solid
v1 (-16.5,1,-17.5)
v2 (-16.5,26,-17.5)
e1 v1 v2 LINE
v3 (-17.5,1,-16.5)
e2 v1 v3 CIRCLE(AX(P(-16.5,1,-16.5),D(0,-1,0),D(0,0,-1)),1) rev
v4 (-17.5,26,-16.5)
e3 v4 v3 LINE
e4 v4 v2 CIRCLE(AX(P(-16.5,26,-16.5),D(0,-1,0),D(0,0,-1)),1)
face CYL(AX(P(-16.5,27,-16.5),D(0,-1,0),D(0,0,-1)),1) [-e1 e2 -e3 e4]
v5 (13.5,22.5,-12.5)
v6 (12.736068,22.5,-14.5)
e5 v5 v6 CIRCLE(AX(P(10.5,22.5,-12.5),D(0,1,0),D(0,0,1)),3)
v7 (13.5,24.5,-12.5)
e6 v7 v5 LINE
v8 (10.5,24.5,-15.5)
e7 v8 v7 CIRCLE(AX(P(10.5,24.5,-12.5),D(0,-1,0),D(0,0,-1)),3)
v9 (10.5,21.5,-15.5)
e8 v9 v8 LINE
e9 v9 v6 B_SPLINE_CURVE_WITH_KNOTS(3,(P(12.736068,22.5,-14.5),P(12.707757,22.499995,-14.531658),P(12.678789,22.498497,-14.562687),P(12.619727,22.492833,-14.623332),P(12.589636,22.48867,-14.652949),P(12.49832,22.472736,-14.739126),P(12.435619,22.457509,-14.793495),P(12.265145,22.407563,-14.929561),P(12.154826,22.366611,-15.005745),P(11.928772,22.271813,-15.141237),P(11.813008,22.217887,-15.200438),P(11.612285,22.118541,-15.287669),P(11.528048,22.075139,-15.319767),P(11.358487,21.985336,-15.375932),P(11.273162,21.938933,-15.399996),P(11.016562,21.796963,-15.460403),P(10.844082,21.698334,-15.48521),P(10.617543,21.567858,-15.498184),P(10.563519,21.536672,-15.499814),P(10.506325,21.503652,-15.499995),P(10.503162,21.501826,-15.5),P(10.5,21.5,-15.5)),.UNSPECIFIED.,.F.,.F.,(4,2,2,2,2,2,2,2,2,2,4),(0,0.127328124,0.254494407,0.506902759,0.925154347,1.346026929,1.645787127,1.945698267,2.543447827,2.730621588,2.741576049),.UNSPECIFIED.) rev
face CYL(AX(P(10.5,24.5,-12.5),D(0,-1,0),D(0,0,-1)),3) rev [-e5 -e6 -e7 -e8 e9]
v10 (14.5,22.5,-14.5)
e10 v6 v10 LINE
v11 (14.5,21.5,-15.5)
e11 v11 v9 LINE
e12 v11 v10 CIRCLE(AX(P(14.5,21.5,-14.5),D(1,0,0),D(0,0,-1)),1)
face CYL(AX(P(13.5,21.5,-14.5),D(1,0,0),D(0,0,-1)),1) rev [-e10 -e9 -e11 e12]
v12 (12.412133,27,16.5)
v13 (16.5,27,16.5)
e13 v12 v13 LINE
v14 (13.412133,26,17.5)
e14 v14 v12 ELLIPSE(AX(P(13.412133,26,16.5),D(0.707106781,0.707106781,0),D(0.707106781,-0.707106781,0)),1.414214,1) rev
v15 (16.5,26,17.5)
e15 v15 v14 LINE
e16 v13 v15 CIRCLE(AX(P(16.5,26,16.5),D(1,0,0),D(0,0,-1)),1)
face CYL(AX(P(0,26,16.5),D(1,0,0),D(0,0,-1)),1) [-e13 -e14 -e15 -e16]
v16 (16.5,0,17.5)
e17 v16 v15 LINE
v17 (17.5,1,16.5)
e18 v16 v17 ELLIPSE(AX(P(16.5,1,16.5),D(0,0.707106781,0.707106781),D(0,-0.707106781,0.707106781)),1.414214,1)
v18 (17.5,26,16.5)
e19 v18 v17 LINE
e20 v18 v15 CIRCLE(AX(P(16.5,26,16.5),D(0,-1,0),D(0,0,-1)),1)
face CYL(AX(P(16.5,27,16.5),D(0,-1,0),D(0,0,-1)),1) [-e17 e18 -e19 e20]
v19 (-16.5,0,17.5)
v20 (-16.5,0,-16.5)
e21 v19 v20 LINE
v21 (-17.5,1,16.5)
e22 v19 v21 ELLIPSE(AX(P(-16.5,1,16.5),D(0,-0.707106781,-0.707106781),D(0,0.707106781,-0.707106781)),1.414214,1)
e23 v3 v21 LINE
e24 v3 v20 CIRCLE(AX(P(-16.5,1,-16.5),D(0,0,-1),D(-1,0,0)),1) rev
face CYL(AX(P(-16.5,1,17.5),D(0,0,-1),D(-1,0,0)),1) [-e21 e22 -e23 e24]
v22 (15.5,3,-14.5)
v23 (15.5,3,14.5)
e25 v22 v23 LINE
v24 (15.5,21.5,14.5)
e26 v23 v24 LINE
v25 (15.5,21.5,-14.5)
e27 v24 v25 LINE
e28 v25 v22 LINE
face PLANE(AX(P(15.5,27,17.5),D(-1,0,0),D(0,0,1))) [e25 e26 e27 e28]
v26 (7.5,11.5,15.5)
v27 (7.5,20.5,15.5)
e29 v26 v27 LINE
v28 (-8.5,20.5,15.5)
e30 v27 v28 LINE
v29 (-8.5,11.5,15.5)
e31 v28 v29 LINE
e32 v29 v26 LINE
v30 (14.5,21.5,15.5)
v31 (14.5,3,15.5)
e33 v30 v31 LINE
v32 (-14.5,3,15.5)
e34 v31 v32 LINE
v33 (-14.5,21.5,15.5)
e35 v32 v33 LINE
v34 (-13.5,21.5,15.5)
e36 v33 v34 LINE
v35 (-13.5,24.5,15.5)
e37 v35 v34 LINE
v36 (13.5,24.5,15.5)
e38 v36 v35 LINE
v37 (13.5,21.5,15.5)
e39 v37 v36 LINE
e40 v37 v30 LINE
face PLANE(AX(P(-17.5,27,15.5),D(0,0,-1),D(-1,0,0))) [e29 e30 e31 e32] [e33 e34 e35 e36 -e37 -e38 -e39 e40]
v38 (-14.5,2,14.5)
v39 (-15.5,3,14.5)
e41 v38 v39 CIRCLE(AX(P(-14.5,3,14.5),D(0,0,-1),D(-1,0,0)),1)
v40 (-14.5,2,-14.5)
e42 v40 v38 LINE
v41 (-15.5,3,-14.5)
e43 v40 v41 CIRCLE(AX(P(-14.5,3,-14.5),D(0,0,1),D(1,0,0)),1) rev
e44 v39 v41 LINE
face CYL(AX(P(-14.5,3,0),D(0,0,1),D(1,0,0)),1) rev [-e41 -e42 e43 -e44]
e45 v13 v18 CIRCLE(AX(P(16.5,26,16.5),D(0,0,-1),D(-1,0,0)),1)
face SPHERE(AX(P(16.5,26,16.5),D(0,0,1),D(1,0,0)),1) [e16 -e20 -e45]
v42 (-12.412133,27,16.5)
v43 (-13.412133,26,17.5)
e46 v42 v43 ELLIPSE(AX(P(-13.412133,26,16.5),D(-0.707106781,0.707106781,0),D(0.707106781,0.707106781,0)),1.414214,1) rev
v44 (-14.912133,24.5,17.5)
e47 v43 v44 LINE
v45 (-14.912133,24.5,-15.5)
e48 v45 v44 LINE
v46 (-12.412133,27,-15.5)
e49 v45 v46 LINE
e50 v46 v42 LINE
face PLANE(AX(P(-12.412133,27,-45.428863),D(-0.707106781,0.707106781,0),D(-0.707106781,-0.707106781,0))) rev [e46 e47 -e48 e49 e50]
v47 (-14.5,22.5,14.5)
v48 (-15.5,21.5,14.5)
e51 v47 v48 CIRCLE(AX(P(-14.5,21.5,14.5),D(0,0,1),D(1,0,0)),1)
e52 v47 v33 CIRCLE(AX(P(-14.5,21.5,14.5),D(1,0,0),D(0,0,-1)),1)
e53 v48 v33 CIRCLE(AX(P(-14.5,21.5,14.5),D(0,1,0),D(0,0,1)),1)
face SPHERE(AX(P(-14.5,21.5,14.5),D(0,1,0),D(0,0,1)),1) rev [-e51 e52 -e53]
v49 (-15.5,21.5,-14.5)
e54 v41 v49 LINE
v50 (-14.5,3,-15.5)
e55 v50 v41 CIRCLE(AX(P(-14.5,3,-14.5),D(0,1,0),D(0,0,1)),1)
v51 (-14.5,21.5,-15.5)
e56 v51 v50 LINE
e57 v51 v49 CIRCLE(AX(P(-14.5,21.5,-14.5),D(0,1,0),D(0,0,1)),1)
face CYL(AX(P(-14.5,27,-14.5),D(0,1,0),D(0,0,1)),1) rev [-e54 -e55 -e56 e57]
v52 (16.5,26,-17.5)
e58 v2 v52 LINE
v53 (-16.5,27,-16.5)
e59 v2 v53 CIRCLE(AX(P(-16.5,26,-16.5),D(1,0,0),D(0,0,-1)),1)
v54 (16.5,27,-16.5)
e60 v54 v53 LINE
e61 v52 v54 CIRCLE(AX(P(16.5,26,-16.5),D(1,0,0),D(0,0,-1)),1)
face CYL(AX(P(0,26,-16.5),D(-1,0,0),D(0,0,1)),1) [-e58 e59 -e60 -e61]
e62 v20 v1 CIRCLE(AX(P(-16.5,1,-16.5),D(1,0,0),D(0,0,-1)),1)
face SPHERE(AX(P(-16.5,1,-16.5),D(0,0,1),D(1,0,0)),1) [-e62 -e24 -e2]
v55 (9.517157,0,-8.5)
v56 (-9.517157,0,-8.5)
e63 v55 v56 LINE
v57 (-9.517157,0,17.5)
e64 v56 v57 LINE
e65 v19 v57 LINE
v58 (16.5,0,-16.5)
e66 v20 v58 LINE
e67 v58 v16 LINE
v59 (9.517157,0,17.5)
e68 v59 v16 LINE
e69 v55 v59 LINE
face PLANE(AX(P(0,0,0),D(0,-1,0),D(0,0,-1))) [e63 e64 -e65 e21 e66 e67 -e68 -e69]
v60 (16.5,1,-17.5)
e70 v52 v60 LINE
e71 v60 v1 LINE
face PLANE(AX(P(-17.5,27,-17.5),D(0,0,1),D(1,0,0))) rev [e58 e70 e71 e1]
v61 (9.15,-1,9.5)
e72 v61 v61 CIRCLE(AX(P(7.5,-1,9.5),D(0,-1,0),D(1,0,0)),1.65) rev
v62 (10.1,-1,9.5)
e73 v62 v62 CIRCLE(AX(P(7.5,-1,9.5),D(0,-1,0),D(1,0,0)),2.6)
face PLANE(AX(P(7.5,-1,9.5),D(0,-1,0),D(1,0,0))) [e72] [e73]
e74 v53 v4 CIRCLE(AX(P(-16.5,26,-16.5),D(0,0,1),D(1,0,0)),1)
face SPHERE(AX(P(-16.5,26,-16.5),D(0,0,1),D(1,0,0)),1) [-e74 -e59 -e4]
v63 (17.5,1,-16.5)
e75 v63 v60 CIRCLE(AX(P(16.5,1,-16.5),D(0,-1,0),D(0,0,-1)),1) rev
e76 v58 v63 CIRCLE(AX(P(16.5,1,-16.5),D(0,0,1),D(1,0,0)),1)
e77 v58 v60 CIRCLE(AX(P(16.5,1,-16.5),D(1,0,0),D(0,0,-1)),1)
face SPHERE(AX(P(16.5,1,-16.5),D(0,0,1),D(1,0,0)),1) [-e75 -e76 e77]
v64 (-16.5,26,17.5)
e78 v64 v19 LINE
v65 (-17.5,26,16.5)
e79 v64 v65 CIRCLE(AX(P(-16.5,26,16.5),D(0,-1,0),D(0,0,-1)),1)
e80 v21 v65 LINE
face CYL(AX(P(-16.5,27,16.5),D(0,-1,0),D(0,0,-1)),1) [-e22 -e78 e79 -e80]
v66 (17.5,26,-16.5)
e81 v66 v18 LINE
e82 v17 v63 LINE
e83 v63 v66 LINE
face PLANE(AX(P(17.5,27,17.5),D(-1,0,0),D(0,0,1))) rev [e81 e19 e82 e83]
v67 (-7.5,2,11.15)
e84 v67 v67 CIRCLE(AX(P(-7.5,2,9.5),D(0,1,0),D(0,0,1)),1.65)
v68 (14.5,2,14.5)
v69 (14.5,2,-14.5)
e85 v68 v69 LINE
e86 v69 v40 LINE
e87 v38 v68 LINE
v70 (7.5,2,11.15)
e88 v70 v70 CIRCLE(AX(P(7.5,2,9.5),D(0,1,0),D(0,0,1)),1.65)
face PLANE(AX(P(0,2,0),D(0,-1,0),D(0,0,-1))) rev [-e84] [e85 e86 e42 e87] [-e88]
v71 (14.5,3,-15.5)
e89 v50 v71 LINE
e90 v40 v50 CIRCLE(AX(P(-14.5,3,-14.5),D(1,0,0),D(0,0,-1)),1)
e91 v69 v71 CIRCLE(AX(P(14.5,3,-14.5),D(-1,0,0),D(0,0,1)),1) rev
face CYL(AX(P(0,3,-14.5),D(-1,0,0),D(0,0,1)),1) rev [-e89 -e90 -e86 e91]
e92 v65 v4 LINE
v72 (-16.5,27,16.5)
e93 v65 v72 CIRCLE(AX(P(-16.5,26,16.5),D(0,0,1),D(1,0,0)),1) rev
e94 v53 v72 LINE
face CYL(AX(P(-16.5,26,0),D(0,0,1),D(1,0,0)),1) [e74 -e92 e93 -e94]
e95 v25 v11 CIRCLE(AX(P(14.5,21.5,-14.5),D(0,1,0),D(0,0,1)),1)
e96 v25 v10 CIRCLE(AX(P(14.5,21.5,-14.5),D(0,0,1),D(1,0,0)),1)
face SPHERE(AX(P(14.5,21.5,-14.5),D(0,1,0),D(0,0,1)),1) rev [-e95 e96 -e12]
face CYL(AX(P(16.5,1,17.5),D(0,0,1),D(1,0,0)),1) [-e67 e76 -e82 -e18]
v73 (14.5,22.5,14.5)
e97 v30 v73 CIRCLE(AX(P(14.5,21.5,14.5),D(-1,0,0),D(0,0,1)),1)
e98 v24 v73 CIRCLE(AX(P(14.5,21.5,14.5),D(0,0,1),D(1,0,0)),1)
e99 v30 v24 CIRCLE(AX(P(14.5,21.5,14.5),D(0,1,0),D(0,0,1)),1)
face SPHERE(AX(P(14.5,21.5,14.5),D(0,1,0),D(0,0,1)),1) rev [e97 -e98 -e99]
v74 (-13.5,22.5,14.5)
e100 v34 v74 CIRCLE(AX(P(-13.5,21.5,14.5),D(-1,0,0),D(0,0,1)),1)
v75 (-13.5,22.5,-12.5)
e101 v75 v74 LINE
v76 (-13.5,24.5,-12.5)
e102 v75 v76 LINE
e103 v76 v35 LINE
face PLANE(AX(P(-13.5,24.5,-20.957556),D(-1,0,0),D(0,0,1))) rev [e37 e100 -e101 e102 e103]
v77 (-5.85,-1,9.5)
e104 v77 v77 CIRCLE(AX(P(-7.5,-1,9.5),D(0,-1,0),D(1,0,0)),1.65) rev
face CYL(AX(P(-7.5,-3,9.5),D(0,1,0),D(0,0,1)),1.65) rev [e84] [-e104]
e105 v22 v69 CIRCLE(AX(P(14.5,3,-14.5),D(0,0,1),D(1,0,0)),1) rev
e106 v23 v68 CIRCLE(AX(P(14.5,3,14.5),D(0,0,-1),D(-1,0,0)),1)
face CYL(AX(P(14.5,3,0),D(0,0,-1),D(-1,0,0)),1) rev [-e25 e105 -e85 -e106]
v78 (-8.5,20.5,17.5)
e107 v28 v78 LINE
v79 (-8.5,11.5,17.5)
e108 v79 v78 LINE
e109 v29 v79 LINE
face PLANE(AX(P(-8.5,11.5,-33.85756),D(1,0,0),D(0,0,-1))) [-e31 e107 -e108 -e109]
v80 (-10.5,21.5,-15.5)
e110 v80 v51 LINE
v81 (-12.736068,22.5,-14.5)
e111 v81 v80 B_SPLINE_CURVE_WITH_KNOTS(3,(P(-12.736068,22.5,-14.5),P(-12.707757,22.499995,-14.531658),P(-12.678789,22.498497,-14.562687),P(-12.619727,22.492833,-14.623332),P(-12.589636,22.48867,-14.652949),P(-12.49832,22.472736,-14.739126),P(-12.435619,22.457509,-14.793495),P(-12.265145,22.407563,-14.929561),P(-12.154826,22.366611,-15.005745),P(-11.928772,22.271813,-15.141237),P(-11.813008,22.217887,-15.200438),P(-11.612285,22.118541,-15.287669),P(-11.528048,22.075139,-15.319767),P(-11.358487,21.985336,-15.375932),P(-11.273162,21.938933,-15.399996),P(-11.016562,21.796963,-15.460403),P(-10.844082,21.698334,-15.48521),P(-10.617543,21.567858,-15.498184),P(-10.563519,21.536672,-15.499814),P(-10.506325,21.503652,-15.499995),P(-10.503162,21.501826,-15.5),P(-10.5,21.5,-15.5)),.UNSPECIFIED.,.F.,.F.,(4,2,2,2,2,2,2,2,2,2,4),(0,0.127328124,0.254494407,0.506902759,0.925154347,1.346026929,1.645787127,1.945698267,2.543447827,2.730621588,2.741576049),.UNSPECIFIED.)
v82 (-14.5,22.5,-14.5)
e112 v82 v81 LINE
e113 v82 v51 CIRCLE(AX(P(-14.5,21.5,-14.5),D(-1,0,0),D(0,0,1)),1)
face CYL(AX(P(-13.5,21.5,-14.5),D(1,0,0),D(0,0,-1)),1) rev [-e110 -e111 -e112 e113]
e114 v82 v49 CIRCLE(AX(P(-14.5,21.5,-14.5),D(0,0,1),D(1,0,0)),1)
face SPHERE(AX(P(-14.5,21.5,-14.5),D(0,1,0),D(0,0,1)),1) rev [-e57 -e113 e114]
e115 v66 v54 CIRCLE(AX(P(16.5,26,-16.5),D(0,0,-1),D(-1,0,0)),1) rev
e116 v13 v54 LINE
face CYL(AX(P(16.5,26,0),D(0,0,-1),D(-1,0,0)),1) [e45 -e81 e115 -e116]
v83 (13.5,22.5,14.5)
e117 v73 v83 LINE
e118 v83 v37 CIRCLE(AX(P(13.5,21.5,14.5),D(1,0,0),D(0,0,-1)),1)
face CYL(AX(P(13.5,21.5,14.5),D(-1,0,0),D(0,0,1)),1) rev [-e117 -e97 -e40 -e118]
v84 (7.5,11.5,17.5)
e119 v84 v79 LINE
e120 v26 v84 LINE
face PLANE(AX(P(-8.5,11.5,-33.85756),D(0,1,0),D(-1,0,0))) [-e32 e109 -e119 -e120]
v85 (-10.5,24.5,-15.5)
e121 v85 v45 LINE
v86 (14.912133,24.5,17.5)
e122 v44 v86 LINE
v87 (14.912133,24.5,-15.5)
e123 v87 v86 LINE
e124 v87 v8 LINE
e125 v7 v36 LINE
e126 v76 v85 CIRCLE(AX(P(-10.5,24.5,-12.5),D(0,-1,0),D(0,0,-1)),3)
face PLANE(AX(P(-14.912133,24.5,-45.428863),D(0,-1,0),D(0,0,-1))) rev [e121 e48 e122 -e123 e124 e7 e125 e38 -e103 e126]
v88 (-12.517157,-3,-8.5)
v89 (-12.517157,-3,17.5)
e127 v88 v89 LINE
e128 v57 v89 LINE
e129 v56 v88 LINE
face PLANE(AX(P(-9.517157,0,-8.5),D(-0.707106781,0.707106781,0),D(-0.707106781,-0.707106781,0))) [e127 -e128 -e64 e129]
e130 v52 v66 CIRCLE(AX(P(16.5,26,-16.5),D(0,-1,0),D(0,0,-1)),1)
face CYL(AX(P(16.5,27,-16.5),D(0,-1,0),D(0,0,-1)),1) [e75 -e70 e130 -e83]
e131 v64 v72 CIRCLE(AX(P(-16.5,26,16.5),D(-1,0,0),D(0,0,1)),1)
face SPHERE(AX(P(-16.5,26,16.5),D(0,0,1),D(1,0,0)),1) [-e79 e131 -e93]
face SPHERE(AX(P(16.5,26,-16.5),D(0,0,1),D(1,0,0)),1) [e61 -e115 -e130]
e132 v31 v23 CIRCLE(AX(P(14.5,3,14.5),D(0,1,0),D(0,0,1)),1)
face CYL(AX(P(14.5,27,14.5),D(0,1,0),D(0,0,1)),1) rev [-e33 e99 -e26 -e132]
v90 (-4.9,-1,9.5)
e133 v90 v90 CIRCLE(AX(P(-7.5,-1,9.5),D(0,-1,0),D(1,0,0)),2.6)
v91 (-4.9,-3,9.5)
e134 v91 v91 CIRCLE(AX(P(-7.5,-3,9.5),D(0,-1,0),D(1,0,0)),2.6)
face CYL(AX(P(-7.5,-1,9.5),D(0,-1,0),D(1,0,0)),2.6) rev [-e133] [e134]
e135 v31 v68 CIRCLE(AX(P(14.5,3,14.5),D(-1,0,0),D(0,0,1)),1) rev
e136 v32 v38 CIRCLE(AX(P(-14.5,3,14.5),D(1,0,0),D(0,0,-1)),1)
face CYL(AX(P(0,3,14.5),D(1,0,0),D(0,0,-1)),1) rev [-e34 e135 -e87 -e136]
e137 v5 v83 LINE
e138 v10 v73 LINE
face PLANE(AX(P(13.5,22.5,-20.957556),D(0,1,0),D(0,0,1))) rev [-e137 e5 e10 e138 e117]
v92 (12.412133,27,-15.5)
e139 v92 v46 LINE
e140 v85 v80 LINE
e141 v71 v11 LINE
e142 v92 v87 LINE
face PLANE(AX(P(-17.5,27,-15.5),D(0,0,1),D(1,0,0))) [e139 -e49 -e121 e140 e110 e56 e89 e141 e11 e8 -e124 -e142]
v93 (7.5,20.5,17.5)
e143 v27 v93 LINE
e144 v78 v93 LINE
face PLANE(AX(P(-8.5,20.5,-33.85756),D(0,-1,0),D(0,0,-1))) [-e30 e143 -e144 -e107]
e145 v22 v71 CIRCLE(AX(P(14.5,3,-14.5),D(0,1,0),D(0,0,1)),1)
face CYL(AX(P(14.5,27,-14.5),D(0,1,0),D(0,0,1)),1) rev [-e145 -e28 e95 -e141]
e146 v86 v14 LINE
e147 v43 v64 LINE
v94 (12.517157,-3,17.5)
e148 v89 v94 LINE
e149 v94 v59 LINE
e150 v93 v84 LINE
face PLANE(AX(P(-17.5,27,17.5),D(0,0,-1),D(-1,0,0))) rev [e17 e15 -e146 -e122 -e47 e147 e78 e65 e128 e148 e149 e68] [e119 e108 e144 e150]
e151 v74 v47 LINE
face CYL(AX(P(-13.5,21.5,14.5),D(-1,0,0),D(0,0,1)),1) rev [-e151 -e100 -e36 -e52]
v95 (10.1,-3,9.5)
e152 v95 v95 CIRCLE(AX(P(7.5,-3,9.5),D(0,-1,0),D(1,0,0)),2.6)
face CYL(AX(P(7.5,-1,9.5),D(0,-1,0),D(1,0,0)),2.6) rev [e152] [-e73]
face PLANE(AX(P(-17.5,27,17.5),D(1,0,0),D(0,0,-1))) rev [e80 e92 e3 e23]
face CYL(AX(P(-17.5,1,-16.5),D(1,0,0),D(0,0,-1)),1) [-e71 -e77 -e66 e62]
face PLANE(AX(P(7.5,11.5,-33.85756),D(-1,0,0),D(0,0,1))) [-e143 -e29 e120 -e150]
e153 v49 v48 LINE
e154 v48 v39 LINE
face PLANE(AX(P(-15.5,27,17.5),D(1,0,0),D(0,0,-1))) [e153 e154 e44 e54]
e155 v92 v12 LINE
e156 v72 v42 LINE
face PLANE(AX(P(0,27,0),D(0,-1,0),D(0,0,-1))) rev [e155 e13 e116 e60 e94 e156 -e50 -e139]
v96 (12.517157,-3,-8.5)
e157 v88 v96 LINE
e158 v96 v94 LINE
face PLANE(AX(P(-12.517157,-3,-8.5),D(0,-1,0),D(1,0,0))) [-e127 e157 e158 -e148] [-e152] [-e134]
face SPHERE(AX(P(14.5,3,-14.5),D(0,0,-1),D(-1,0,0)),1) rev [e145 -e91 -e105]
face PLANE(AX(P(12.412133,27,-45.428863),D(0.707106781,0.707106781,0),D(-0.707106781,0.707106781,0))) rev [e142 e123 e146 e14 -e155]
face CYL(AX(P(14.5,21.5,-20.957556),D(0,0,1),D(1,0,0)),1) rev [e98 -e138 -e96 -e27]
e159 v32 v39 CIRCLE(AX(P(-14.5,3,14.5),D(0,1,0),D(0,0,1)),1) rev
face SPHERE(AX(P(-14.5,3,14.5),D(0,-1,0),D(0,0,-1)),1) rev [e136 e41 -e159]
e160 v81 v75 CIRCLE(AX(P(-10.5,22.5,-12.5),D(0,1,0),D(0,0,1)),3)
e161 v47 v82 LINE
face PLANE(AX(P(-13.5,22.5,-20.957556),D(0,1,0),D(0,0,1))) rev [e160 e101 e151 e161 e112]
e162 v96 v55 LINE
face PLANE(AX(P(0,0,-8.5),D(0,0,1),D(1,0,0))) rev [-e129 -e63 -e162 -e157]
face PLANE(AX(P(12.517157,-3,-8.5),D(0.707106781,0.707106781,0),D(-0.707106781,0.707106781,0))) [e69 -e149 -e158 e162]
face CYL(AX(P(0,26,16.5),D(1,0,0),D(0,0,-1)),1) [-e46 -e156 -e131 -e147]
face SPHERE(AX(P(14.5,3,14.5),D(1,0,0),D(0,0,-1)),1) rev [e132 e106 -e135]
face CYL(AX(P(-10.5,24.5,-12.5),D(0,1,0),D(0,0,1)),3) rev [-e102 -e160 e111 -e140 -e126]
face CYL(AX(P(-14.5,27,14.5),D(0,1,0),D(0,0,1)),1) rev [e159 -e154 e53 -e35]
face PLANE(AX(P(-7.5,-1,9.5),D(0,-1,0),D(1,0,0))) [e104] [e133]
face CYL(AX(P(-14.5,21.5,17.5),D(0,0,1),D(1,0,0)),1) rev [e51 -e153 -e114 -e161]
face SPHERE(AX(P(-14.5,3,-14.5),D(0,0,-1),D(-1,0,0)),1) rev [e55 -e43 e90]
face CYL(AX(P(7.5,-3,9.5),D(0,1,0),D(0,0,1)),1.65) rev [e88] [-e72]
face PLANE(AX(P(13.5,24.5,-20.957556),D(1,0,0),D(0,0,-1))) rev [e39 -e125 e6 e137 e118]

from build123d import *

# Parameters (mm, degrees)
SKETCH1_W           = 35
SKETCH1_H           = 35
BOSS_EXTRUDE1_DEPTH = 27
SHELL1_T            = -2
CUT_EXTRUDE7_DEPTH  = 33
BOSS_EXTRUDE4_DEPTH = 31
BOSS_EXTRUDE3_DEPTH = 26
FILLET1_R           = 1
FILLET2_R           = 1
FILLET3_R           = 1
FILLET4_R           = 1
SKETCH10_R          = 1.65
CUT_EXTRUDE3_DEPTH  = 36.178118199
SKETCH11_W          = 16
SKETCH11_H          = 9
CUT_EXTRUDE4_DEPTH  = 2
SKETCH13_R          = 2.6
CUT_EXTRUDE6_DEPTH  = 2
FILLET5_R           = 3
FILLET6_R           = 1


with BuildPart() as part:
    # Sketch1 → Boss-Extrude1 (new body)
    with BuildSketch(Plane(origin=(0, 0, 0), x_dir=(1, 0, 0), z_dir=(0, 1, 0))):
        Rectangle(SKETCH1_W, SKETCH1_H)
    extrude(amount=BOSS_EXTRUDE1_DEPTH)

    # Shell1
    shell1_openings = [part.faces().sort_by_distance(p)[0] for p in [
        (0, 27, 0),
    ]]
    offset(amount=SHELL1_T, openings=shell1_openings, kind=Kind.INTERSECTION)

    # Sketch5 → Cut-Extrude7 (cut)
    with BuildSketch(Plane.XY.offset(17.5)):
        Polygon((-12.412133126, 27), (12.412133126, 27), (14.912133126, 24.5), (-14.912133126, 24.5), align=None)
    extrude(amount=-CUT_EXTRUDE7_DEPTH, mode=Mode.SUBTRACT)

    # Sketch16 → Boss-Extrude4 (add)
    with BuildSketch(Plane(origin=(0, 0, 15.5), x_dir=(-1, 0, 0), z_dir=(0, 0, -1))):
        Polygon((-15.5, 27), (-12.412133126, 27), (-14.912133126, 24.5), (-13.5, 24.5), (-13.5, 22.5), (-15.5, 22.5), align=None)
        Polygon((13.5, 22.5), (15.5, 22.5), (15.5, 27), (12.412133126, 27), (14.912133126, 24.5), (13.5, 24.5), align=None)
    extrude(amount=BOSS_EXTRUDE4_DEPTH)

    # Sketch9 → Boss-Extrude3 (add)
    with BuildSketch(Plane.XY.offset(17.5)):
        Polygon((-9.517157288, 0), (-12.517157288, -3), (12.517157288, -3), (9.517157288, 0), align=None)
    extrude(amount=-BOSS_EXTRUDE3_DEPTH)

    # Fillet1
    fillet1_edges = [part.edges().sort_by_distance(p)[0] for p in [
        (15.5, 2, 0),
        (0, 2, -15.5),
        (-15.5, 2, 0),
        (0, 2, 15.5),
        (15.5, 12.25, 15.5),
        (15.5, 12.25, -15.5),
        (-15.5, 12.25, -15.5),
        (-15.5, 12.25, 15.5),
    ]]
    fillet(fillet1_edges, radius=FILLET1_R)

    # Fillet2
    fillet2_edges = [part.edges().sort_by_distance(p)[0] for p in [
        (-17.5, 27, 0),
        (17.5, 27, 0),
        (-17.5, 0, 0),
        (17.5, 0, 0),
        (17.5, 13.5, 17.5),
        (-17.5, 13.5, 17.5),
        (-17.5, 13.5, -17.5),
        (17.5, 13.5, -17.5),
    ]]
    fillet(fillet2_edges, radius=FILLET2_R)

    # Fillet3
    # the kernel refuses this fillet: 1 mm, written as the material it takes off along each edge
    with BuildSketch(Plane(origin=(16.5, 26, -16.5), x_dir=(0, 0, -1), z_dir=(0, 1, 0))) as fillet3_piece_1_section:
        Polygon((0, 0), (FILLET3_R, 0), (FILLET3_R, -FILLET3_R), (0, -FILLET3_R), align=None)
    fillet3_piece_1 = extrude(amount=FILLET3_R, mode=Mode.PRIVATE)
    fillet3_piece_1 = fillet3_piece_1 - Plane(origin=(16.5, 26, -16.5), x_dir=(-0.7071067811865475, 0, 0.7071067811865475), z_dir=(0, 1, 0)) * Sphere(FILLET3_R, mode=Mode.PRIVATE)
    add(fillet3_piece_1, mode=Mode.SUBTRACT)
    with BuildSketch(Plane(origin=(16.5, 1, -16.5), x_dir=(0, -1, 0), z_dir=(0, 0, -1))) as fillet3_piece_2_section:
        Polygon((0, 0), (FILLET3_R, 0), (FILLET3_R, -FILLET3_R), (0, -FILLET3_R), align=None)
    fillet3_piece_2 = extrude(amount=FILLET3_R, mode=Mode.PRIVATE)
    fillet3_piece_2 = fillet3_piece_2 - Plane(origin=(16.5, 1, -16.5), x_dir=(-0.7071067811865475, 0.7071067811865475, 0), z_dir=(0, 0, -1)) * Sphere(FILLET3_R, mode=Mode.PRIVATE)
    add(fillet3_piece_2, mode=Mode.SUBTRACT)
    with BuildSketch(Plane(origin=(-16.5, 26, -16.5), x_dir=(0, 0, -1), z_dir=(0, 1, 0))) as fillet3_piece_3_section:
        Polygon((0, 0), (FILLET3_R, 0), (FILLET3_R, FILLET3_R), (0, FILLET3_R), align=None)
    fillet3_piece_3 = extrude(amount=FILLET3_R, mode=Mode.PRIVATE)
    fillet3_piece_3 = fillet3_piece_3 - Plane(origin=(-16.5, 26, -16.5), x_dir=(0.7071067811865475, 0, 0.7071067811865475), z_dir=(0, 1, 0)) * Sphere(FILLET3_R, mode=Mode.PRIVATE)
    add(fillet3_piece_3, mode=Mode.SUBTRACT)
    with BuildSketch(Plane(origin=(-16.5, 1, -16.5), x_dir=(0, -1, 0), z_dir=(0, 0, -1))) as fillet3_piece_4_section:
        Polygon((0, 0), (FILLET3_R, 0), (FILLET3_R, FILLET3_R), (0, FILLET3_R), align=None)
    fillet3_piece_4 = extrude(amount=FILLET3_R, mode=Mode.PRIVATE)
    fillet3_piece_4 = fillet3_piece_4 - Plane(origin=(-16.5, 1, -16.5), x_dir=(0.7071067811865475, 0.7071067811865475, 0), z_dir=(0, 0, -1)) * Sphere(FILLET3_R, mode=Mode.PRIVATE)
    add(fillet3_piece_4, mode=Mode.SUBTRACT)
    with BuildSketch(Plane(origin=(16.5, 27, -17.5), x_dir=(0, 0, 1), z_dir=(-1, 0, 0)), Plane(origin=(16.5, 0, -17.5), x_dir=(0, 1, 0), z_dir=(-1, 0, 0))) as fillet3_piece_5:
        with BuildLine():
            CenterArc((FILLET3_R, -FILLET3_R), FILLET3_R, 90, 90)
            Line((0, -FILLET3_R), (0, 0))
            Line((0, 0), (FILLET3_R, 0))
        make_face()
    extrude(amount=33, mode=Mode.SUBTRACT)

    # Fillet4
    # the kernel refuses this fillet: 1 mm, written as the material it takes off along each edge
    with BuildSketch(Plane(origin=(16.5, 26, 16.5), x_dir=(0, 0, 1), z_dir=(0, 1, 0))) as fillet4_piece_1_section:
        Polygon((0, 0), (FILLET4_R, 0), (FILLET4_R, FILLET4_R), (0, FILLET4_R), align=None)
    fillet4_piece_1 = extrude(amount=FILLET4_R, mode=Mode.PRIVATE)
    fillet4_piece_1 = fillet4_piece_1 - Plane(origin=(16.5, 26, 16.5), x_dir=(-0.7071067811865475, 0, -0.7071067811865475), z_dir=(0, 1, 0)) * Sphere(FILLET4_R, mode=Mode.PRIVATE)
    add(fillet4_piece_1, mode=Mode.SUBTRACT)
    with BuildSketch(Plane(origin=(-16.5, 26, 16.5), x_dir=(0, 0, 1), z_dir=(0, 1, 0))) as fillet4_piece_2_section:
        Polygon((0, 0), (FILLET4_R, 0), (FILLET4_R, -FILLET4_R), (0, -FILLET4_R), align=None)
    fillet4_piece_2 = extrude(amount=FILLET4_R, mode=Mode.PRIVATE)
    fillet4_piece_2 = fillet4_piece_2 - Plane(origin=(-16.5, 26, 16.5), x_dir=(0.7071067811865475, 0, -0.7071067811865475), z_dir=(0, 1, 0)) * Sphere(FILLET4_R, mode=Mode.PRIVATE)
    add(fillet4_piece_2, mode=Mode.SUBTRACT)
    with BuildSketch(Plane(origin=(-16.5, 27, 17.5), x_dir=(0, 0, -1), z_dir=(1, 0, 0)), Plane(origin=(9.912133126, 27, 17.5), x_dir=(0, 0, -1), z_dir=(1, 0, 0))) as fillet4_piece_3:
        with BuildLine():
            CenterArc((FILLET4_R, -FILLET4_R), FILLET4_R, 90, 90)
            Line((0, -FILLET4_R), (0, 0))
            Line((0, 0), (FILLET4_R, 0))
        make_face()
    extrude(amount=6.587866874, mode=Mode.SUBTRACT)

    # Sketch10 → Cut-Extrude3 (cut, through all)
    with BuildSketch(Plane(origin=(0, 2, 0), x_dir=(1, 0, 0), z_dir=(0, 1, 0))):
        with Locations(Location((-7.5, -9.5, 0), (0, 0, 270))):
            Circle(SKETCH10_R)
        with Locations(Location((7.5, -9.5, 0), (0, 0, 270))):
            Circle(SKETCH10_R)
    extrude(amount=-CUT_EXTRUDE3_DEPTH, mode=Mode.SUBTRACT)

    # Sketch11 → Cut-Extrude4 (cut)
    with BuildSketch(Plane(origin=(0, 0, 17.5), x_dir=(-1, 0, 0), z_dir=(0, 0, -1))):
        with Locations((0.5, 16)):
            Rectangle(SKETCH11_W, SKETCH11_H)
    extrude(amount=CUT_EXTRUDE4_DEPTH, mode=Mode.SUBTRACT)

    # Sketch13 → Cut-Extrude6 (cut)
    with BuildSketch(Plane.XZ.offset(3)):
        with Locations((-7.5, 9.5)):
            Circle(SKETCH13_R)
        with Locations((7.5, 9.5)):
            Circle(SKETCH13_R)
    extrude(amount=-CUT_EXTRUDE6_DEPTH, mode=Mode.SUBTRACT)

    # Fillet5
    fillet5_edges = [part.edges().sort_by_distance(p)[0] for p in [
        (13.5, 23.5, -15.5),
        (-13.5, 23.5, -15.5),
    ]]
    fillet(fillet5_edges, radius=FILLET5_R)

    # Fillet6
    fillet6_edges = [part.edges().sort_by_distance(p)[0] for p in [
        (-15.207106781, 22.5, -15.207106781),
        (-15.207106781, 22.5, 15.207106781),
        (15.5, 22.5, 0),
        (15.207106781, 22.5, 15.207106781),
        (15.207106781, 22.5, -15.207106781),
        (12.5, 22.5, -15.5),
        (-14, 22.5, 15.5),
        (-15.5, 22.5, 0),
        (14, 22.5, 15.5),
        (-12.5, 22.5, -15.5),
    ]]
    fillet(fillet6_edges, radius=FILLET6_R)


solid = part.part
